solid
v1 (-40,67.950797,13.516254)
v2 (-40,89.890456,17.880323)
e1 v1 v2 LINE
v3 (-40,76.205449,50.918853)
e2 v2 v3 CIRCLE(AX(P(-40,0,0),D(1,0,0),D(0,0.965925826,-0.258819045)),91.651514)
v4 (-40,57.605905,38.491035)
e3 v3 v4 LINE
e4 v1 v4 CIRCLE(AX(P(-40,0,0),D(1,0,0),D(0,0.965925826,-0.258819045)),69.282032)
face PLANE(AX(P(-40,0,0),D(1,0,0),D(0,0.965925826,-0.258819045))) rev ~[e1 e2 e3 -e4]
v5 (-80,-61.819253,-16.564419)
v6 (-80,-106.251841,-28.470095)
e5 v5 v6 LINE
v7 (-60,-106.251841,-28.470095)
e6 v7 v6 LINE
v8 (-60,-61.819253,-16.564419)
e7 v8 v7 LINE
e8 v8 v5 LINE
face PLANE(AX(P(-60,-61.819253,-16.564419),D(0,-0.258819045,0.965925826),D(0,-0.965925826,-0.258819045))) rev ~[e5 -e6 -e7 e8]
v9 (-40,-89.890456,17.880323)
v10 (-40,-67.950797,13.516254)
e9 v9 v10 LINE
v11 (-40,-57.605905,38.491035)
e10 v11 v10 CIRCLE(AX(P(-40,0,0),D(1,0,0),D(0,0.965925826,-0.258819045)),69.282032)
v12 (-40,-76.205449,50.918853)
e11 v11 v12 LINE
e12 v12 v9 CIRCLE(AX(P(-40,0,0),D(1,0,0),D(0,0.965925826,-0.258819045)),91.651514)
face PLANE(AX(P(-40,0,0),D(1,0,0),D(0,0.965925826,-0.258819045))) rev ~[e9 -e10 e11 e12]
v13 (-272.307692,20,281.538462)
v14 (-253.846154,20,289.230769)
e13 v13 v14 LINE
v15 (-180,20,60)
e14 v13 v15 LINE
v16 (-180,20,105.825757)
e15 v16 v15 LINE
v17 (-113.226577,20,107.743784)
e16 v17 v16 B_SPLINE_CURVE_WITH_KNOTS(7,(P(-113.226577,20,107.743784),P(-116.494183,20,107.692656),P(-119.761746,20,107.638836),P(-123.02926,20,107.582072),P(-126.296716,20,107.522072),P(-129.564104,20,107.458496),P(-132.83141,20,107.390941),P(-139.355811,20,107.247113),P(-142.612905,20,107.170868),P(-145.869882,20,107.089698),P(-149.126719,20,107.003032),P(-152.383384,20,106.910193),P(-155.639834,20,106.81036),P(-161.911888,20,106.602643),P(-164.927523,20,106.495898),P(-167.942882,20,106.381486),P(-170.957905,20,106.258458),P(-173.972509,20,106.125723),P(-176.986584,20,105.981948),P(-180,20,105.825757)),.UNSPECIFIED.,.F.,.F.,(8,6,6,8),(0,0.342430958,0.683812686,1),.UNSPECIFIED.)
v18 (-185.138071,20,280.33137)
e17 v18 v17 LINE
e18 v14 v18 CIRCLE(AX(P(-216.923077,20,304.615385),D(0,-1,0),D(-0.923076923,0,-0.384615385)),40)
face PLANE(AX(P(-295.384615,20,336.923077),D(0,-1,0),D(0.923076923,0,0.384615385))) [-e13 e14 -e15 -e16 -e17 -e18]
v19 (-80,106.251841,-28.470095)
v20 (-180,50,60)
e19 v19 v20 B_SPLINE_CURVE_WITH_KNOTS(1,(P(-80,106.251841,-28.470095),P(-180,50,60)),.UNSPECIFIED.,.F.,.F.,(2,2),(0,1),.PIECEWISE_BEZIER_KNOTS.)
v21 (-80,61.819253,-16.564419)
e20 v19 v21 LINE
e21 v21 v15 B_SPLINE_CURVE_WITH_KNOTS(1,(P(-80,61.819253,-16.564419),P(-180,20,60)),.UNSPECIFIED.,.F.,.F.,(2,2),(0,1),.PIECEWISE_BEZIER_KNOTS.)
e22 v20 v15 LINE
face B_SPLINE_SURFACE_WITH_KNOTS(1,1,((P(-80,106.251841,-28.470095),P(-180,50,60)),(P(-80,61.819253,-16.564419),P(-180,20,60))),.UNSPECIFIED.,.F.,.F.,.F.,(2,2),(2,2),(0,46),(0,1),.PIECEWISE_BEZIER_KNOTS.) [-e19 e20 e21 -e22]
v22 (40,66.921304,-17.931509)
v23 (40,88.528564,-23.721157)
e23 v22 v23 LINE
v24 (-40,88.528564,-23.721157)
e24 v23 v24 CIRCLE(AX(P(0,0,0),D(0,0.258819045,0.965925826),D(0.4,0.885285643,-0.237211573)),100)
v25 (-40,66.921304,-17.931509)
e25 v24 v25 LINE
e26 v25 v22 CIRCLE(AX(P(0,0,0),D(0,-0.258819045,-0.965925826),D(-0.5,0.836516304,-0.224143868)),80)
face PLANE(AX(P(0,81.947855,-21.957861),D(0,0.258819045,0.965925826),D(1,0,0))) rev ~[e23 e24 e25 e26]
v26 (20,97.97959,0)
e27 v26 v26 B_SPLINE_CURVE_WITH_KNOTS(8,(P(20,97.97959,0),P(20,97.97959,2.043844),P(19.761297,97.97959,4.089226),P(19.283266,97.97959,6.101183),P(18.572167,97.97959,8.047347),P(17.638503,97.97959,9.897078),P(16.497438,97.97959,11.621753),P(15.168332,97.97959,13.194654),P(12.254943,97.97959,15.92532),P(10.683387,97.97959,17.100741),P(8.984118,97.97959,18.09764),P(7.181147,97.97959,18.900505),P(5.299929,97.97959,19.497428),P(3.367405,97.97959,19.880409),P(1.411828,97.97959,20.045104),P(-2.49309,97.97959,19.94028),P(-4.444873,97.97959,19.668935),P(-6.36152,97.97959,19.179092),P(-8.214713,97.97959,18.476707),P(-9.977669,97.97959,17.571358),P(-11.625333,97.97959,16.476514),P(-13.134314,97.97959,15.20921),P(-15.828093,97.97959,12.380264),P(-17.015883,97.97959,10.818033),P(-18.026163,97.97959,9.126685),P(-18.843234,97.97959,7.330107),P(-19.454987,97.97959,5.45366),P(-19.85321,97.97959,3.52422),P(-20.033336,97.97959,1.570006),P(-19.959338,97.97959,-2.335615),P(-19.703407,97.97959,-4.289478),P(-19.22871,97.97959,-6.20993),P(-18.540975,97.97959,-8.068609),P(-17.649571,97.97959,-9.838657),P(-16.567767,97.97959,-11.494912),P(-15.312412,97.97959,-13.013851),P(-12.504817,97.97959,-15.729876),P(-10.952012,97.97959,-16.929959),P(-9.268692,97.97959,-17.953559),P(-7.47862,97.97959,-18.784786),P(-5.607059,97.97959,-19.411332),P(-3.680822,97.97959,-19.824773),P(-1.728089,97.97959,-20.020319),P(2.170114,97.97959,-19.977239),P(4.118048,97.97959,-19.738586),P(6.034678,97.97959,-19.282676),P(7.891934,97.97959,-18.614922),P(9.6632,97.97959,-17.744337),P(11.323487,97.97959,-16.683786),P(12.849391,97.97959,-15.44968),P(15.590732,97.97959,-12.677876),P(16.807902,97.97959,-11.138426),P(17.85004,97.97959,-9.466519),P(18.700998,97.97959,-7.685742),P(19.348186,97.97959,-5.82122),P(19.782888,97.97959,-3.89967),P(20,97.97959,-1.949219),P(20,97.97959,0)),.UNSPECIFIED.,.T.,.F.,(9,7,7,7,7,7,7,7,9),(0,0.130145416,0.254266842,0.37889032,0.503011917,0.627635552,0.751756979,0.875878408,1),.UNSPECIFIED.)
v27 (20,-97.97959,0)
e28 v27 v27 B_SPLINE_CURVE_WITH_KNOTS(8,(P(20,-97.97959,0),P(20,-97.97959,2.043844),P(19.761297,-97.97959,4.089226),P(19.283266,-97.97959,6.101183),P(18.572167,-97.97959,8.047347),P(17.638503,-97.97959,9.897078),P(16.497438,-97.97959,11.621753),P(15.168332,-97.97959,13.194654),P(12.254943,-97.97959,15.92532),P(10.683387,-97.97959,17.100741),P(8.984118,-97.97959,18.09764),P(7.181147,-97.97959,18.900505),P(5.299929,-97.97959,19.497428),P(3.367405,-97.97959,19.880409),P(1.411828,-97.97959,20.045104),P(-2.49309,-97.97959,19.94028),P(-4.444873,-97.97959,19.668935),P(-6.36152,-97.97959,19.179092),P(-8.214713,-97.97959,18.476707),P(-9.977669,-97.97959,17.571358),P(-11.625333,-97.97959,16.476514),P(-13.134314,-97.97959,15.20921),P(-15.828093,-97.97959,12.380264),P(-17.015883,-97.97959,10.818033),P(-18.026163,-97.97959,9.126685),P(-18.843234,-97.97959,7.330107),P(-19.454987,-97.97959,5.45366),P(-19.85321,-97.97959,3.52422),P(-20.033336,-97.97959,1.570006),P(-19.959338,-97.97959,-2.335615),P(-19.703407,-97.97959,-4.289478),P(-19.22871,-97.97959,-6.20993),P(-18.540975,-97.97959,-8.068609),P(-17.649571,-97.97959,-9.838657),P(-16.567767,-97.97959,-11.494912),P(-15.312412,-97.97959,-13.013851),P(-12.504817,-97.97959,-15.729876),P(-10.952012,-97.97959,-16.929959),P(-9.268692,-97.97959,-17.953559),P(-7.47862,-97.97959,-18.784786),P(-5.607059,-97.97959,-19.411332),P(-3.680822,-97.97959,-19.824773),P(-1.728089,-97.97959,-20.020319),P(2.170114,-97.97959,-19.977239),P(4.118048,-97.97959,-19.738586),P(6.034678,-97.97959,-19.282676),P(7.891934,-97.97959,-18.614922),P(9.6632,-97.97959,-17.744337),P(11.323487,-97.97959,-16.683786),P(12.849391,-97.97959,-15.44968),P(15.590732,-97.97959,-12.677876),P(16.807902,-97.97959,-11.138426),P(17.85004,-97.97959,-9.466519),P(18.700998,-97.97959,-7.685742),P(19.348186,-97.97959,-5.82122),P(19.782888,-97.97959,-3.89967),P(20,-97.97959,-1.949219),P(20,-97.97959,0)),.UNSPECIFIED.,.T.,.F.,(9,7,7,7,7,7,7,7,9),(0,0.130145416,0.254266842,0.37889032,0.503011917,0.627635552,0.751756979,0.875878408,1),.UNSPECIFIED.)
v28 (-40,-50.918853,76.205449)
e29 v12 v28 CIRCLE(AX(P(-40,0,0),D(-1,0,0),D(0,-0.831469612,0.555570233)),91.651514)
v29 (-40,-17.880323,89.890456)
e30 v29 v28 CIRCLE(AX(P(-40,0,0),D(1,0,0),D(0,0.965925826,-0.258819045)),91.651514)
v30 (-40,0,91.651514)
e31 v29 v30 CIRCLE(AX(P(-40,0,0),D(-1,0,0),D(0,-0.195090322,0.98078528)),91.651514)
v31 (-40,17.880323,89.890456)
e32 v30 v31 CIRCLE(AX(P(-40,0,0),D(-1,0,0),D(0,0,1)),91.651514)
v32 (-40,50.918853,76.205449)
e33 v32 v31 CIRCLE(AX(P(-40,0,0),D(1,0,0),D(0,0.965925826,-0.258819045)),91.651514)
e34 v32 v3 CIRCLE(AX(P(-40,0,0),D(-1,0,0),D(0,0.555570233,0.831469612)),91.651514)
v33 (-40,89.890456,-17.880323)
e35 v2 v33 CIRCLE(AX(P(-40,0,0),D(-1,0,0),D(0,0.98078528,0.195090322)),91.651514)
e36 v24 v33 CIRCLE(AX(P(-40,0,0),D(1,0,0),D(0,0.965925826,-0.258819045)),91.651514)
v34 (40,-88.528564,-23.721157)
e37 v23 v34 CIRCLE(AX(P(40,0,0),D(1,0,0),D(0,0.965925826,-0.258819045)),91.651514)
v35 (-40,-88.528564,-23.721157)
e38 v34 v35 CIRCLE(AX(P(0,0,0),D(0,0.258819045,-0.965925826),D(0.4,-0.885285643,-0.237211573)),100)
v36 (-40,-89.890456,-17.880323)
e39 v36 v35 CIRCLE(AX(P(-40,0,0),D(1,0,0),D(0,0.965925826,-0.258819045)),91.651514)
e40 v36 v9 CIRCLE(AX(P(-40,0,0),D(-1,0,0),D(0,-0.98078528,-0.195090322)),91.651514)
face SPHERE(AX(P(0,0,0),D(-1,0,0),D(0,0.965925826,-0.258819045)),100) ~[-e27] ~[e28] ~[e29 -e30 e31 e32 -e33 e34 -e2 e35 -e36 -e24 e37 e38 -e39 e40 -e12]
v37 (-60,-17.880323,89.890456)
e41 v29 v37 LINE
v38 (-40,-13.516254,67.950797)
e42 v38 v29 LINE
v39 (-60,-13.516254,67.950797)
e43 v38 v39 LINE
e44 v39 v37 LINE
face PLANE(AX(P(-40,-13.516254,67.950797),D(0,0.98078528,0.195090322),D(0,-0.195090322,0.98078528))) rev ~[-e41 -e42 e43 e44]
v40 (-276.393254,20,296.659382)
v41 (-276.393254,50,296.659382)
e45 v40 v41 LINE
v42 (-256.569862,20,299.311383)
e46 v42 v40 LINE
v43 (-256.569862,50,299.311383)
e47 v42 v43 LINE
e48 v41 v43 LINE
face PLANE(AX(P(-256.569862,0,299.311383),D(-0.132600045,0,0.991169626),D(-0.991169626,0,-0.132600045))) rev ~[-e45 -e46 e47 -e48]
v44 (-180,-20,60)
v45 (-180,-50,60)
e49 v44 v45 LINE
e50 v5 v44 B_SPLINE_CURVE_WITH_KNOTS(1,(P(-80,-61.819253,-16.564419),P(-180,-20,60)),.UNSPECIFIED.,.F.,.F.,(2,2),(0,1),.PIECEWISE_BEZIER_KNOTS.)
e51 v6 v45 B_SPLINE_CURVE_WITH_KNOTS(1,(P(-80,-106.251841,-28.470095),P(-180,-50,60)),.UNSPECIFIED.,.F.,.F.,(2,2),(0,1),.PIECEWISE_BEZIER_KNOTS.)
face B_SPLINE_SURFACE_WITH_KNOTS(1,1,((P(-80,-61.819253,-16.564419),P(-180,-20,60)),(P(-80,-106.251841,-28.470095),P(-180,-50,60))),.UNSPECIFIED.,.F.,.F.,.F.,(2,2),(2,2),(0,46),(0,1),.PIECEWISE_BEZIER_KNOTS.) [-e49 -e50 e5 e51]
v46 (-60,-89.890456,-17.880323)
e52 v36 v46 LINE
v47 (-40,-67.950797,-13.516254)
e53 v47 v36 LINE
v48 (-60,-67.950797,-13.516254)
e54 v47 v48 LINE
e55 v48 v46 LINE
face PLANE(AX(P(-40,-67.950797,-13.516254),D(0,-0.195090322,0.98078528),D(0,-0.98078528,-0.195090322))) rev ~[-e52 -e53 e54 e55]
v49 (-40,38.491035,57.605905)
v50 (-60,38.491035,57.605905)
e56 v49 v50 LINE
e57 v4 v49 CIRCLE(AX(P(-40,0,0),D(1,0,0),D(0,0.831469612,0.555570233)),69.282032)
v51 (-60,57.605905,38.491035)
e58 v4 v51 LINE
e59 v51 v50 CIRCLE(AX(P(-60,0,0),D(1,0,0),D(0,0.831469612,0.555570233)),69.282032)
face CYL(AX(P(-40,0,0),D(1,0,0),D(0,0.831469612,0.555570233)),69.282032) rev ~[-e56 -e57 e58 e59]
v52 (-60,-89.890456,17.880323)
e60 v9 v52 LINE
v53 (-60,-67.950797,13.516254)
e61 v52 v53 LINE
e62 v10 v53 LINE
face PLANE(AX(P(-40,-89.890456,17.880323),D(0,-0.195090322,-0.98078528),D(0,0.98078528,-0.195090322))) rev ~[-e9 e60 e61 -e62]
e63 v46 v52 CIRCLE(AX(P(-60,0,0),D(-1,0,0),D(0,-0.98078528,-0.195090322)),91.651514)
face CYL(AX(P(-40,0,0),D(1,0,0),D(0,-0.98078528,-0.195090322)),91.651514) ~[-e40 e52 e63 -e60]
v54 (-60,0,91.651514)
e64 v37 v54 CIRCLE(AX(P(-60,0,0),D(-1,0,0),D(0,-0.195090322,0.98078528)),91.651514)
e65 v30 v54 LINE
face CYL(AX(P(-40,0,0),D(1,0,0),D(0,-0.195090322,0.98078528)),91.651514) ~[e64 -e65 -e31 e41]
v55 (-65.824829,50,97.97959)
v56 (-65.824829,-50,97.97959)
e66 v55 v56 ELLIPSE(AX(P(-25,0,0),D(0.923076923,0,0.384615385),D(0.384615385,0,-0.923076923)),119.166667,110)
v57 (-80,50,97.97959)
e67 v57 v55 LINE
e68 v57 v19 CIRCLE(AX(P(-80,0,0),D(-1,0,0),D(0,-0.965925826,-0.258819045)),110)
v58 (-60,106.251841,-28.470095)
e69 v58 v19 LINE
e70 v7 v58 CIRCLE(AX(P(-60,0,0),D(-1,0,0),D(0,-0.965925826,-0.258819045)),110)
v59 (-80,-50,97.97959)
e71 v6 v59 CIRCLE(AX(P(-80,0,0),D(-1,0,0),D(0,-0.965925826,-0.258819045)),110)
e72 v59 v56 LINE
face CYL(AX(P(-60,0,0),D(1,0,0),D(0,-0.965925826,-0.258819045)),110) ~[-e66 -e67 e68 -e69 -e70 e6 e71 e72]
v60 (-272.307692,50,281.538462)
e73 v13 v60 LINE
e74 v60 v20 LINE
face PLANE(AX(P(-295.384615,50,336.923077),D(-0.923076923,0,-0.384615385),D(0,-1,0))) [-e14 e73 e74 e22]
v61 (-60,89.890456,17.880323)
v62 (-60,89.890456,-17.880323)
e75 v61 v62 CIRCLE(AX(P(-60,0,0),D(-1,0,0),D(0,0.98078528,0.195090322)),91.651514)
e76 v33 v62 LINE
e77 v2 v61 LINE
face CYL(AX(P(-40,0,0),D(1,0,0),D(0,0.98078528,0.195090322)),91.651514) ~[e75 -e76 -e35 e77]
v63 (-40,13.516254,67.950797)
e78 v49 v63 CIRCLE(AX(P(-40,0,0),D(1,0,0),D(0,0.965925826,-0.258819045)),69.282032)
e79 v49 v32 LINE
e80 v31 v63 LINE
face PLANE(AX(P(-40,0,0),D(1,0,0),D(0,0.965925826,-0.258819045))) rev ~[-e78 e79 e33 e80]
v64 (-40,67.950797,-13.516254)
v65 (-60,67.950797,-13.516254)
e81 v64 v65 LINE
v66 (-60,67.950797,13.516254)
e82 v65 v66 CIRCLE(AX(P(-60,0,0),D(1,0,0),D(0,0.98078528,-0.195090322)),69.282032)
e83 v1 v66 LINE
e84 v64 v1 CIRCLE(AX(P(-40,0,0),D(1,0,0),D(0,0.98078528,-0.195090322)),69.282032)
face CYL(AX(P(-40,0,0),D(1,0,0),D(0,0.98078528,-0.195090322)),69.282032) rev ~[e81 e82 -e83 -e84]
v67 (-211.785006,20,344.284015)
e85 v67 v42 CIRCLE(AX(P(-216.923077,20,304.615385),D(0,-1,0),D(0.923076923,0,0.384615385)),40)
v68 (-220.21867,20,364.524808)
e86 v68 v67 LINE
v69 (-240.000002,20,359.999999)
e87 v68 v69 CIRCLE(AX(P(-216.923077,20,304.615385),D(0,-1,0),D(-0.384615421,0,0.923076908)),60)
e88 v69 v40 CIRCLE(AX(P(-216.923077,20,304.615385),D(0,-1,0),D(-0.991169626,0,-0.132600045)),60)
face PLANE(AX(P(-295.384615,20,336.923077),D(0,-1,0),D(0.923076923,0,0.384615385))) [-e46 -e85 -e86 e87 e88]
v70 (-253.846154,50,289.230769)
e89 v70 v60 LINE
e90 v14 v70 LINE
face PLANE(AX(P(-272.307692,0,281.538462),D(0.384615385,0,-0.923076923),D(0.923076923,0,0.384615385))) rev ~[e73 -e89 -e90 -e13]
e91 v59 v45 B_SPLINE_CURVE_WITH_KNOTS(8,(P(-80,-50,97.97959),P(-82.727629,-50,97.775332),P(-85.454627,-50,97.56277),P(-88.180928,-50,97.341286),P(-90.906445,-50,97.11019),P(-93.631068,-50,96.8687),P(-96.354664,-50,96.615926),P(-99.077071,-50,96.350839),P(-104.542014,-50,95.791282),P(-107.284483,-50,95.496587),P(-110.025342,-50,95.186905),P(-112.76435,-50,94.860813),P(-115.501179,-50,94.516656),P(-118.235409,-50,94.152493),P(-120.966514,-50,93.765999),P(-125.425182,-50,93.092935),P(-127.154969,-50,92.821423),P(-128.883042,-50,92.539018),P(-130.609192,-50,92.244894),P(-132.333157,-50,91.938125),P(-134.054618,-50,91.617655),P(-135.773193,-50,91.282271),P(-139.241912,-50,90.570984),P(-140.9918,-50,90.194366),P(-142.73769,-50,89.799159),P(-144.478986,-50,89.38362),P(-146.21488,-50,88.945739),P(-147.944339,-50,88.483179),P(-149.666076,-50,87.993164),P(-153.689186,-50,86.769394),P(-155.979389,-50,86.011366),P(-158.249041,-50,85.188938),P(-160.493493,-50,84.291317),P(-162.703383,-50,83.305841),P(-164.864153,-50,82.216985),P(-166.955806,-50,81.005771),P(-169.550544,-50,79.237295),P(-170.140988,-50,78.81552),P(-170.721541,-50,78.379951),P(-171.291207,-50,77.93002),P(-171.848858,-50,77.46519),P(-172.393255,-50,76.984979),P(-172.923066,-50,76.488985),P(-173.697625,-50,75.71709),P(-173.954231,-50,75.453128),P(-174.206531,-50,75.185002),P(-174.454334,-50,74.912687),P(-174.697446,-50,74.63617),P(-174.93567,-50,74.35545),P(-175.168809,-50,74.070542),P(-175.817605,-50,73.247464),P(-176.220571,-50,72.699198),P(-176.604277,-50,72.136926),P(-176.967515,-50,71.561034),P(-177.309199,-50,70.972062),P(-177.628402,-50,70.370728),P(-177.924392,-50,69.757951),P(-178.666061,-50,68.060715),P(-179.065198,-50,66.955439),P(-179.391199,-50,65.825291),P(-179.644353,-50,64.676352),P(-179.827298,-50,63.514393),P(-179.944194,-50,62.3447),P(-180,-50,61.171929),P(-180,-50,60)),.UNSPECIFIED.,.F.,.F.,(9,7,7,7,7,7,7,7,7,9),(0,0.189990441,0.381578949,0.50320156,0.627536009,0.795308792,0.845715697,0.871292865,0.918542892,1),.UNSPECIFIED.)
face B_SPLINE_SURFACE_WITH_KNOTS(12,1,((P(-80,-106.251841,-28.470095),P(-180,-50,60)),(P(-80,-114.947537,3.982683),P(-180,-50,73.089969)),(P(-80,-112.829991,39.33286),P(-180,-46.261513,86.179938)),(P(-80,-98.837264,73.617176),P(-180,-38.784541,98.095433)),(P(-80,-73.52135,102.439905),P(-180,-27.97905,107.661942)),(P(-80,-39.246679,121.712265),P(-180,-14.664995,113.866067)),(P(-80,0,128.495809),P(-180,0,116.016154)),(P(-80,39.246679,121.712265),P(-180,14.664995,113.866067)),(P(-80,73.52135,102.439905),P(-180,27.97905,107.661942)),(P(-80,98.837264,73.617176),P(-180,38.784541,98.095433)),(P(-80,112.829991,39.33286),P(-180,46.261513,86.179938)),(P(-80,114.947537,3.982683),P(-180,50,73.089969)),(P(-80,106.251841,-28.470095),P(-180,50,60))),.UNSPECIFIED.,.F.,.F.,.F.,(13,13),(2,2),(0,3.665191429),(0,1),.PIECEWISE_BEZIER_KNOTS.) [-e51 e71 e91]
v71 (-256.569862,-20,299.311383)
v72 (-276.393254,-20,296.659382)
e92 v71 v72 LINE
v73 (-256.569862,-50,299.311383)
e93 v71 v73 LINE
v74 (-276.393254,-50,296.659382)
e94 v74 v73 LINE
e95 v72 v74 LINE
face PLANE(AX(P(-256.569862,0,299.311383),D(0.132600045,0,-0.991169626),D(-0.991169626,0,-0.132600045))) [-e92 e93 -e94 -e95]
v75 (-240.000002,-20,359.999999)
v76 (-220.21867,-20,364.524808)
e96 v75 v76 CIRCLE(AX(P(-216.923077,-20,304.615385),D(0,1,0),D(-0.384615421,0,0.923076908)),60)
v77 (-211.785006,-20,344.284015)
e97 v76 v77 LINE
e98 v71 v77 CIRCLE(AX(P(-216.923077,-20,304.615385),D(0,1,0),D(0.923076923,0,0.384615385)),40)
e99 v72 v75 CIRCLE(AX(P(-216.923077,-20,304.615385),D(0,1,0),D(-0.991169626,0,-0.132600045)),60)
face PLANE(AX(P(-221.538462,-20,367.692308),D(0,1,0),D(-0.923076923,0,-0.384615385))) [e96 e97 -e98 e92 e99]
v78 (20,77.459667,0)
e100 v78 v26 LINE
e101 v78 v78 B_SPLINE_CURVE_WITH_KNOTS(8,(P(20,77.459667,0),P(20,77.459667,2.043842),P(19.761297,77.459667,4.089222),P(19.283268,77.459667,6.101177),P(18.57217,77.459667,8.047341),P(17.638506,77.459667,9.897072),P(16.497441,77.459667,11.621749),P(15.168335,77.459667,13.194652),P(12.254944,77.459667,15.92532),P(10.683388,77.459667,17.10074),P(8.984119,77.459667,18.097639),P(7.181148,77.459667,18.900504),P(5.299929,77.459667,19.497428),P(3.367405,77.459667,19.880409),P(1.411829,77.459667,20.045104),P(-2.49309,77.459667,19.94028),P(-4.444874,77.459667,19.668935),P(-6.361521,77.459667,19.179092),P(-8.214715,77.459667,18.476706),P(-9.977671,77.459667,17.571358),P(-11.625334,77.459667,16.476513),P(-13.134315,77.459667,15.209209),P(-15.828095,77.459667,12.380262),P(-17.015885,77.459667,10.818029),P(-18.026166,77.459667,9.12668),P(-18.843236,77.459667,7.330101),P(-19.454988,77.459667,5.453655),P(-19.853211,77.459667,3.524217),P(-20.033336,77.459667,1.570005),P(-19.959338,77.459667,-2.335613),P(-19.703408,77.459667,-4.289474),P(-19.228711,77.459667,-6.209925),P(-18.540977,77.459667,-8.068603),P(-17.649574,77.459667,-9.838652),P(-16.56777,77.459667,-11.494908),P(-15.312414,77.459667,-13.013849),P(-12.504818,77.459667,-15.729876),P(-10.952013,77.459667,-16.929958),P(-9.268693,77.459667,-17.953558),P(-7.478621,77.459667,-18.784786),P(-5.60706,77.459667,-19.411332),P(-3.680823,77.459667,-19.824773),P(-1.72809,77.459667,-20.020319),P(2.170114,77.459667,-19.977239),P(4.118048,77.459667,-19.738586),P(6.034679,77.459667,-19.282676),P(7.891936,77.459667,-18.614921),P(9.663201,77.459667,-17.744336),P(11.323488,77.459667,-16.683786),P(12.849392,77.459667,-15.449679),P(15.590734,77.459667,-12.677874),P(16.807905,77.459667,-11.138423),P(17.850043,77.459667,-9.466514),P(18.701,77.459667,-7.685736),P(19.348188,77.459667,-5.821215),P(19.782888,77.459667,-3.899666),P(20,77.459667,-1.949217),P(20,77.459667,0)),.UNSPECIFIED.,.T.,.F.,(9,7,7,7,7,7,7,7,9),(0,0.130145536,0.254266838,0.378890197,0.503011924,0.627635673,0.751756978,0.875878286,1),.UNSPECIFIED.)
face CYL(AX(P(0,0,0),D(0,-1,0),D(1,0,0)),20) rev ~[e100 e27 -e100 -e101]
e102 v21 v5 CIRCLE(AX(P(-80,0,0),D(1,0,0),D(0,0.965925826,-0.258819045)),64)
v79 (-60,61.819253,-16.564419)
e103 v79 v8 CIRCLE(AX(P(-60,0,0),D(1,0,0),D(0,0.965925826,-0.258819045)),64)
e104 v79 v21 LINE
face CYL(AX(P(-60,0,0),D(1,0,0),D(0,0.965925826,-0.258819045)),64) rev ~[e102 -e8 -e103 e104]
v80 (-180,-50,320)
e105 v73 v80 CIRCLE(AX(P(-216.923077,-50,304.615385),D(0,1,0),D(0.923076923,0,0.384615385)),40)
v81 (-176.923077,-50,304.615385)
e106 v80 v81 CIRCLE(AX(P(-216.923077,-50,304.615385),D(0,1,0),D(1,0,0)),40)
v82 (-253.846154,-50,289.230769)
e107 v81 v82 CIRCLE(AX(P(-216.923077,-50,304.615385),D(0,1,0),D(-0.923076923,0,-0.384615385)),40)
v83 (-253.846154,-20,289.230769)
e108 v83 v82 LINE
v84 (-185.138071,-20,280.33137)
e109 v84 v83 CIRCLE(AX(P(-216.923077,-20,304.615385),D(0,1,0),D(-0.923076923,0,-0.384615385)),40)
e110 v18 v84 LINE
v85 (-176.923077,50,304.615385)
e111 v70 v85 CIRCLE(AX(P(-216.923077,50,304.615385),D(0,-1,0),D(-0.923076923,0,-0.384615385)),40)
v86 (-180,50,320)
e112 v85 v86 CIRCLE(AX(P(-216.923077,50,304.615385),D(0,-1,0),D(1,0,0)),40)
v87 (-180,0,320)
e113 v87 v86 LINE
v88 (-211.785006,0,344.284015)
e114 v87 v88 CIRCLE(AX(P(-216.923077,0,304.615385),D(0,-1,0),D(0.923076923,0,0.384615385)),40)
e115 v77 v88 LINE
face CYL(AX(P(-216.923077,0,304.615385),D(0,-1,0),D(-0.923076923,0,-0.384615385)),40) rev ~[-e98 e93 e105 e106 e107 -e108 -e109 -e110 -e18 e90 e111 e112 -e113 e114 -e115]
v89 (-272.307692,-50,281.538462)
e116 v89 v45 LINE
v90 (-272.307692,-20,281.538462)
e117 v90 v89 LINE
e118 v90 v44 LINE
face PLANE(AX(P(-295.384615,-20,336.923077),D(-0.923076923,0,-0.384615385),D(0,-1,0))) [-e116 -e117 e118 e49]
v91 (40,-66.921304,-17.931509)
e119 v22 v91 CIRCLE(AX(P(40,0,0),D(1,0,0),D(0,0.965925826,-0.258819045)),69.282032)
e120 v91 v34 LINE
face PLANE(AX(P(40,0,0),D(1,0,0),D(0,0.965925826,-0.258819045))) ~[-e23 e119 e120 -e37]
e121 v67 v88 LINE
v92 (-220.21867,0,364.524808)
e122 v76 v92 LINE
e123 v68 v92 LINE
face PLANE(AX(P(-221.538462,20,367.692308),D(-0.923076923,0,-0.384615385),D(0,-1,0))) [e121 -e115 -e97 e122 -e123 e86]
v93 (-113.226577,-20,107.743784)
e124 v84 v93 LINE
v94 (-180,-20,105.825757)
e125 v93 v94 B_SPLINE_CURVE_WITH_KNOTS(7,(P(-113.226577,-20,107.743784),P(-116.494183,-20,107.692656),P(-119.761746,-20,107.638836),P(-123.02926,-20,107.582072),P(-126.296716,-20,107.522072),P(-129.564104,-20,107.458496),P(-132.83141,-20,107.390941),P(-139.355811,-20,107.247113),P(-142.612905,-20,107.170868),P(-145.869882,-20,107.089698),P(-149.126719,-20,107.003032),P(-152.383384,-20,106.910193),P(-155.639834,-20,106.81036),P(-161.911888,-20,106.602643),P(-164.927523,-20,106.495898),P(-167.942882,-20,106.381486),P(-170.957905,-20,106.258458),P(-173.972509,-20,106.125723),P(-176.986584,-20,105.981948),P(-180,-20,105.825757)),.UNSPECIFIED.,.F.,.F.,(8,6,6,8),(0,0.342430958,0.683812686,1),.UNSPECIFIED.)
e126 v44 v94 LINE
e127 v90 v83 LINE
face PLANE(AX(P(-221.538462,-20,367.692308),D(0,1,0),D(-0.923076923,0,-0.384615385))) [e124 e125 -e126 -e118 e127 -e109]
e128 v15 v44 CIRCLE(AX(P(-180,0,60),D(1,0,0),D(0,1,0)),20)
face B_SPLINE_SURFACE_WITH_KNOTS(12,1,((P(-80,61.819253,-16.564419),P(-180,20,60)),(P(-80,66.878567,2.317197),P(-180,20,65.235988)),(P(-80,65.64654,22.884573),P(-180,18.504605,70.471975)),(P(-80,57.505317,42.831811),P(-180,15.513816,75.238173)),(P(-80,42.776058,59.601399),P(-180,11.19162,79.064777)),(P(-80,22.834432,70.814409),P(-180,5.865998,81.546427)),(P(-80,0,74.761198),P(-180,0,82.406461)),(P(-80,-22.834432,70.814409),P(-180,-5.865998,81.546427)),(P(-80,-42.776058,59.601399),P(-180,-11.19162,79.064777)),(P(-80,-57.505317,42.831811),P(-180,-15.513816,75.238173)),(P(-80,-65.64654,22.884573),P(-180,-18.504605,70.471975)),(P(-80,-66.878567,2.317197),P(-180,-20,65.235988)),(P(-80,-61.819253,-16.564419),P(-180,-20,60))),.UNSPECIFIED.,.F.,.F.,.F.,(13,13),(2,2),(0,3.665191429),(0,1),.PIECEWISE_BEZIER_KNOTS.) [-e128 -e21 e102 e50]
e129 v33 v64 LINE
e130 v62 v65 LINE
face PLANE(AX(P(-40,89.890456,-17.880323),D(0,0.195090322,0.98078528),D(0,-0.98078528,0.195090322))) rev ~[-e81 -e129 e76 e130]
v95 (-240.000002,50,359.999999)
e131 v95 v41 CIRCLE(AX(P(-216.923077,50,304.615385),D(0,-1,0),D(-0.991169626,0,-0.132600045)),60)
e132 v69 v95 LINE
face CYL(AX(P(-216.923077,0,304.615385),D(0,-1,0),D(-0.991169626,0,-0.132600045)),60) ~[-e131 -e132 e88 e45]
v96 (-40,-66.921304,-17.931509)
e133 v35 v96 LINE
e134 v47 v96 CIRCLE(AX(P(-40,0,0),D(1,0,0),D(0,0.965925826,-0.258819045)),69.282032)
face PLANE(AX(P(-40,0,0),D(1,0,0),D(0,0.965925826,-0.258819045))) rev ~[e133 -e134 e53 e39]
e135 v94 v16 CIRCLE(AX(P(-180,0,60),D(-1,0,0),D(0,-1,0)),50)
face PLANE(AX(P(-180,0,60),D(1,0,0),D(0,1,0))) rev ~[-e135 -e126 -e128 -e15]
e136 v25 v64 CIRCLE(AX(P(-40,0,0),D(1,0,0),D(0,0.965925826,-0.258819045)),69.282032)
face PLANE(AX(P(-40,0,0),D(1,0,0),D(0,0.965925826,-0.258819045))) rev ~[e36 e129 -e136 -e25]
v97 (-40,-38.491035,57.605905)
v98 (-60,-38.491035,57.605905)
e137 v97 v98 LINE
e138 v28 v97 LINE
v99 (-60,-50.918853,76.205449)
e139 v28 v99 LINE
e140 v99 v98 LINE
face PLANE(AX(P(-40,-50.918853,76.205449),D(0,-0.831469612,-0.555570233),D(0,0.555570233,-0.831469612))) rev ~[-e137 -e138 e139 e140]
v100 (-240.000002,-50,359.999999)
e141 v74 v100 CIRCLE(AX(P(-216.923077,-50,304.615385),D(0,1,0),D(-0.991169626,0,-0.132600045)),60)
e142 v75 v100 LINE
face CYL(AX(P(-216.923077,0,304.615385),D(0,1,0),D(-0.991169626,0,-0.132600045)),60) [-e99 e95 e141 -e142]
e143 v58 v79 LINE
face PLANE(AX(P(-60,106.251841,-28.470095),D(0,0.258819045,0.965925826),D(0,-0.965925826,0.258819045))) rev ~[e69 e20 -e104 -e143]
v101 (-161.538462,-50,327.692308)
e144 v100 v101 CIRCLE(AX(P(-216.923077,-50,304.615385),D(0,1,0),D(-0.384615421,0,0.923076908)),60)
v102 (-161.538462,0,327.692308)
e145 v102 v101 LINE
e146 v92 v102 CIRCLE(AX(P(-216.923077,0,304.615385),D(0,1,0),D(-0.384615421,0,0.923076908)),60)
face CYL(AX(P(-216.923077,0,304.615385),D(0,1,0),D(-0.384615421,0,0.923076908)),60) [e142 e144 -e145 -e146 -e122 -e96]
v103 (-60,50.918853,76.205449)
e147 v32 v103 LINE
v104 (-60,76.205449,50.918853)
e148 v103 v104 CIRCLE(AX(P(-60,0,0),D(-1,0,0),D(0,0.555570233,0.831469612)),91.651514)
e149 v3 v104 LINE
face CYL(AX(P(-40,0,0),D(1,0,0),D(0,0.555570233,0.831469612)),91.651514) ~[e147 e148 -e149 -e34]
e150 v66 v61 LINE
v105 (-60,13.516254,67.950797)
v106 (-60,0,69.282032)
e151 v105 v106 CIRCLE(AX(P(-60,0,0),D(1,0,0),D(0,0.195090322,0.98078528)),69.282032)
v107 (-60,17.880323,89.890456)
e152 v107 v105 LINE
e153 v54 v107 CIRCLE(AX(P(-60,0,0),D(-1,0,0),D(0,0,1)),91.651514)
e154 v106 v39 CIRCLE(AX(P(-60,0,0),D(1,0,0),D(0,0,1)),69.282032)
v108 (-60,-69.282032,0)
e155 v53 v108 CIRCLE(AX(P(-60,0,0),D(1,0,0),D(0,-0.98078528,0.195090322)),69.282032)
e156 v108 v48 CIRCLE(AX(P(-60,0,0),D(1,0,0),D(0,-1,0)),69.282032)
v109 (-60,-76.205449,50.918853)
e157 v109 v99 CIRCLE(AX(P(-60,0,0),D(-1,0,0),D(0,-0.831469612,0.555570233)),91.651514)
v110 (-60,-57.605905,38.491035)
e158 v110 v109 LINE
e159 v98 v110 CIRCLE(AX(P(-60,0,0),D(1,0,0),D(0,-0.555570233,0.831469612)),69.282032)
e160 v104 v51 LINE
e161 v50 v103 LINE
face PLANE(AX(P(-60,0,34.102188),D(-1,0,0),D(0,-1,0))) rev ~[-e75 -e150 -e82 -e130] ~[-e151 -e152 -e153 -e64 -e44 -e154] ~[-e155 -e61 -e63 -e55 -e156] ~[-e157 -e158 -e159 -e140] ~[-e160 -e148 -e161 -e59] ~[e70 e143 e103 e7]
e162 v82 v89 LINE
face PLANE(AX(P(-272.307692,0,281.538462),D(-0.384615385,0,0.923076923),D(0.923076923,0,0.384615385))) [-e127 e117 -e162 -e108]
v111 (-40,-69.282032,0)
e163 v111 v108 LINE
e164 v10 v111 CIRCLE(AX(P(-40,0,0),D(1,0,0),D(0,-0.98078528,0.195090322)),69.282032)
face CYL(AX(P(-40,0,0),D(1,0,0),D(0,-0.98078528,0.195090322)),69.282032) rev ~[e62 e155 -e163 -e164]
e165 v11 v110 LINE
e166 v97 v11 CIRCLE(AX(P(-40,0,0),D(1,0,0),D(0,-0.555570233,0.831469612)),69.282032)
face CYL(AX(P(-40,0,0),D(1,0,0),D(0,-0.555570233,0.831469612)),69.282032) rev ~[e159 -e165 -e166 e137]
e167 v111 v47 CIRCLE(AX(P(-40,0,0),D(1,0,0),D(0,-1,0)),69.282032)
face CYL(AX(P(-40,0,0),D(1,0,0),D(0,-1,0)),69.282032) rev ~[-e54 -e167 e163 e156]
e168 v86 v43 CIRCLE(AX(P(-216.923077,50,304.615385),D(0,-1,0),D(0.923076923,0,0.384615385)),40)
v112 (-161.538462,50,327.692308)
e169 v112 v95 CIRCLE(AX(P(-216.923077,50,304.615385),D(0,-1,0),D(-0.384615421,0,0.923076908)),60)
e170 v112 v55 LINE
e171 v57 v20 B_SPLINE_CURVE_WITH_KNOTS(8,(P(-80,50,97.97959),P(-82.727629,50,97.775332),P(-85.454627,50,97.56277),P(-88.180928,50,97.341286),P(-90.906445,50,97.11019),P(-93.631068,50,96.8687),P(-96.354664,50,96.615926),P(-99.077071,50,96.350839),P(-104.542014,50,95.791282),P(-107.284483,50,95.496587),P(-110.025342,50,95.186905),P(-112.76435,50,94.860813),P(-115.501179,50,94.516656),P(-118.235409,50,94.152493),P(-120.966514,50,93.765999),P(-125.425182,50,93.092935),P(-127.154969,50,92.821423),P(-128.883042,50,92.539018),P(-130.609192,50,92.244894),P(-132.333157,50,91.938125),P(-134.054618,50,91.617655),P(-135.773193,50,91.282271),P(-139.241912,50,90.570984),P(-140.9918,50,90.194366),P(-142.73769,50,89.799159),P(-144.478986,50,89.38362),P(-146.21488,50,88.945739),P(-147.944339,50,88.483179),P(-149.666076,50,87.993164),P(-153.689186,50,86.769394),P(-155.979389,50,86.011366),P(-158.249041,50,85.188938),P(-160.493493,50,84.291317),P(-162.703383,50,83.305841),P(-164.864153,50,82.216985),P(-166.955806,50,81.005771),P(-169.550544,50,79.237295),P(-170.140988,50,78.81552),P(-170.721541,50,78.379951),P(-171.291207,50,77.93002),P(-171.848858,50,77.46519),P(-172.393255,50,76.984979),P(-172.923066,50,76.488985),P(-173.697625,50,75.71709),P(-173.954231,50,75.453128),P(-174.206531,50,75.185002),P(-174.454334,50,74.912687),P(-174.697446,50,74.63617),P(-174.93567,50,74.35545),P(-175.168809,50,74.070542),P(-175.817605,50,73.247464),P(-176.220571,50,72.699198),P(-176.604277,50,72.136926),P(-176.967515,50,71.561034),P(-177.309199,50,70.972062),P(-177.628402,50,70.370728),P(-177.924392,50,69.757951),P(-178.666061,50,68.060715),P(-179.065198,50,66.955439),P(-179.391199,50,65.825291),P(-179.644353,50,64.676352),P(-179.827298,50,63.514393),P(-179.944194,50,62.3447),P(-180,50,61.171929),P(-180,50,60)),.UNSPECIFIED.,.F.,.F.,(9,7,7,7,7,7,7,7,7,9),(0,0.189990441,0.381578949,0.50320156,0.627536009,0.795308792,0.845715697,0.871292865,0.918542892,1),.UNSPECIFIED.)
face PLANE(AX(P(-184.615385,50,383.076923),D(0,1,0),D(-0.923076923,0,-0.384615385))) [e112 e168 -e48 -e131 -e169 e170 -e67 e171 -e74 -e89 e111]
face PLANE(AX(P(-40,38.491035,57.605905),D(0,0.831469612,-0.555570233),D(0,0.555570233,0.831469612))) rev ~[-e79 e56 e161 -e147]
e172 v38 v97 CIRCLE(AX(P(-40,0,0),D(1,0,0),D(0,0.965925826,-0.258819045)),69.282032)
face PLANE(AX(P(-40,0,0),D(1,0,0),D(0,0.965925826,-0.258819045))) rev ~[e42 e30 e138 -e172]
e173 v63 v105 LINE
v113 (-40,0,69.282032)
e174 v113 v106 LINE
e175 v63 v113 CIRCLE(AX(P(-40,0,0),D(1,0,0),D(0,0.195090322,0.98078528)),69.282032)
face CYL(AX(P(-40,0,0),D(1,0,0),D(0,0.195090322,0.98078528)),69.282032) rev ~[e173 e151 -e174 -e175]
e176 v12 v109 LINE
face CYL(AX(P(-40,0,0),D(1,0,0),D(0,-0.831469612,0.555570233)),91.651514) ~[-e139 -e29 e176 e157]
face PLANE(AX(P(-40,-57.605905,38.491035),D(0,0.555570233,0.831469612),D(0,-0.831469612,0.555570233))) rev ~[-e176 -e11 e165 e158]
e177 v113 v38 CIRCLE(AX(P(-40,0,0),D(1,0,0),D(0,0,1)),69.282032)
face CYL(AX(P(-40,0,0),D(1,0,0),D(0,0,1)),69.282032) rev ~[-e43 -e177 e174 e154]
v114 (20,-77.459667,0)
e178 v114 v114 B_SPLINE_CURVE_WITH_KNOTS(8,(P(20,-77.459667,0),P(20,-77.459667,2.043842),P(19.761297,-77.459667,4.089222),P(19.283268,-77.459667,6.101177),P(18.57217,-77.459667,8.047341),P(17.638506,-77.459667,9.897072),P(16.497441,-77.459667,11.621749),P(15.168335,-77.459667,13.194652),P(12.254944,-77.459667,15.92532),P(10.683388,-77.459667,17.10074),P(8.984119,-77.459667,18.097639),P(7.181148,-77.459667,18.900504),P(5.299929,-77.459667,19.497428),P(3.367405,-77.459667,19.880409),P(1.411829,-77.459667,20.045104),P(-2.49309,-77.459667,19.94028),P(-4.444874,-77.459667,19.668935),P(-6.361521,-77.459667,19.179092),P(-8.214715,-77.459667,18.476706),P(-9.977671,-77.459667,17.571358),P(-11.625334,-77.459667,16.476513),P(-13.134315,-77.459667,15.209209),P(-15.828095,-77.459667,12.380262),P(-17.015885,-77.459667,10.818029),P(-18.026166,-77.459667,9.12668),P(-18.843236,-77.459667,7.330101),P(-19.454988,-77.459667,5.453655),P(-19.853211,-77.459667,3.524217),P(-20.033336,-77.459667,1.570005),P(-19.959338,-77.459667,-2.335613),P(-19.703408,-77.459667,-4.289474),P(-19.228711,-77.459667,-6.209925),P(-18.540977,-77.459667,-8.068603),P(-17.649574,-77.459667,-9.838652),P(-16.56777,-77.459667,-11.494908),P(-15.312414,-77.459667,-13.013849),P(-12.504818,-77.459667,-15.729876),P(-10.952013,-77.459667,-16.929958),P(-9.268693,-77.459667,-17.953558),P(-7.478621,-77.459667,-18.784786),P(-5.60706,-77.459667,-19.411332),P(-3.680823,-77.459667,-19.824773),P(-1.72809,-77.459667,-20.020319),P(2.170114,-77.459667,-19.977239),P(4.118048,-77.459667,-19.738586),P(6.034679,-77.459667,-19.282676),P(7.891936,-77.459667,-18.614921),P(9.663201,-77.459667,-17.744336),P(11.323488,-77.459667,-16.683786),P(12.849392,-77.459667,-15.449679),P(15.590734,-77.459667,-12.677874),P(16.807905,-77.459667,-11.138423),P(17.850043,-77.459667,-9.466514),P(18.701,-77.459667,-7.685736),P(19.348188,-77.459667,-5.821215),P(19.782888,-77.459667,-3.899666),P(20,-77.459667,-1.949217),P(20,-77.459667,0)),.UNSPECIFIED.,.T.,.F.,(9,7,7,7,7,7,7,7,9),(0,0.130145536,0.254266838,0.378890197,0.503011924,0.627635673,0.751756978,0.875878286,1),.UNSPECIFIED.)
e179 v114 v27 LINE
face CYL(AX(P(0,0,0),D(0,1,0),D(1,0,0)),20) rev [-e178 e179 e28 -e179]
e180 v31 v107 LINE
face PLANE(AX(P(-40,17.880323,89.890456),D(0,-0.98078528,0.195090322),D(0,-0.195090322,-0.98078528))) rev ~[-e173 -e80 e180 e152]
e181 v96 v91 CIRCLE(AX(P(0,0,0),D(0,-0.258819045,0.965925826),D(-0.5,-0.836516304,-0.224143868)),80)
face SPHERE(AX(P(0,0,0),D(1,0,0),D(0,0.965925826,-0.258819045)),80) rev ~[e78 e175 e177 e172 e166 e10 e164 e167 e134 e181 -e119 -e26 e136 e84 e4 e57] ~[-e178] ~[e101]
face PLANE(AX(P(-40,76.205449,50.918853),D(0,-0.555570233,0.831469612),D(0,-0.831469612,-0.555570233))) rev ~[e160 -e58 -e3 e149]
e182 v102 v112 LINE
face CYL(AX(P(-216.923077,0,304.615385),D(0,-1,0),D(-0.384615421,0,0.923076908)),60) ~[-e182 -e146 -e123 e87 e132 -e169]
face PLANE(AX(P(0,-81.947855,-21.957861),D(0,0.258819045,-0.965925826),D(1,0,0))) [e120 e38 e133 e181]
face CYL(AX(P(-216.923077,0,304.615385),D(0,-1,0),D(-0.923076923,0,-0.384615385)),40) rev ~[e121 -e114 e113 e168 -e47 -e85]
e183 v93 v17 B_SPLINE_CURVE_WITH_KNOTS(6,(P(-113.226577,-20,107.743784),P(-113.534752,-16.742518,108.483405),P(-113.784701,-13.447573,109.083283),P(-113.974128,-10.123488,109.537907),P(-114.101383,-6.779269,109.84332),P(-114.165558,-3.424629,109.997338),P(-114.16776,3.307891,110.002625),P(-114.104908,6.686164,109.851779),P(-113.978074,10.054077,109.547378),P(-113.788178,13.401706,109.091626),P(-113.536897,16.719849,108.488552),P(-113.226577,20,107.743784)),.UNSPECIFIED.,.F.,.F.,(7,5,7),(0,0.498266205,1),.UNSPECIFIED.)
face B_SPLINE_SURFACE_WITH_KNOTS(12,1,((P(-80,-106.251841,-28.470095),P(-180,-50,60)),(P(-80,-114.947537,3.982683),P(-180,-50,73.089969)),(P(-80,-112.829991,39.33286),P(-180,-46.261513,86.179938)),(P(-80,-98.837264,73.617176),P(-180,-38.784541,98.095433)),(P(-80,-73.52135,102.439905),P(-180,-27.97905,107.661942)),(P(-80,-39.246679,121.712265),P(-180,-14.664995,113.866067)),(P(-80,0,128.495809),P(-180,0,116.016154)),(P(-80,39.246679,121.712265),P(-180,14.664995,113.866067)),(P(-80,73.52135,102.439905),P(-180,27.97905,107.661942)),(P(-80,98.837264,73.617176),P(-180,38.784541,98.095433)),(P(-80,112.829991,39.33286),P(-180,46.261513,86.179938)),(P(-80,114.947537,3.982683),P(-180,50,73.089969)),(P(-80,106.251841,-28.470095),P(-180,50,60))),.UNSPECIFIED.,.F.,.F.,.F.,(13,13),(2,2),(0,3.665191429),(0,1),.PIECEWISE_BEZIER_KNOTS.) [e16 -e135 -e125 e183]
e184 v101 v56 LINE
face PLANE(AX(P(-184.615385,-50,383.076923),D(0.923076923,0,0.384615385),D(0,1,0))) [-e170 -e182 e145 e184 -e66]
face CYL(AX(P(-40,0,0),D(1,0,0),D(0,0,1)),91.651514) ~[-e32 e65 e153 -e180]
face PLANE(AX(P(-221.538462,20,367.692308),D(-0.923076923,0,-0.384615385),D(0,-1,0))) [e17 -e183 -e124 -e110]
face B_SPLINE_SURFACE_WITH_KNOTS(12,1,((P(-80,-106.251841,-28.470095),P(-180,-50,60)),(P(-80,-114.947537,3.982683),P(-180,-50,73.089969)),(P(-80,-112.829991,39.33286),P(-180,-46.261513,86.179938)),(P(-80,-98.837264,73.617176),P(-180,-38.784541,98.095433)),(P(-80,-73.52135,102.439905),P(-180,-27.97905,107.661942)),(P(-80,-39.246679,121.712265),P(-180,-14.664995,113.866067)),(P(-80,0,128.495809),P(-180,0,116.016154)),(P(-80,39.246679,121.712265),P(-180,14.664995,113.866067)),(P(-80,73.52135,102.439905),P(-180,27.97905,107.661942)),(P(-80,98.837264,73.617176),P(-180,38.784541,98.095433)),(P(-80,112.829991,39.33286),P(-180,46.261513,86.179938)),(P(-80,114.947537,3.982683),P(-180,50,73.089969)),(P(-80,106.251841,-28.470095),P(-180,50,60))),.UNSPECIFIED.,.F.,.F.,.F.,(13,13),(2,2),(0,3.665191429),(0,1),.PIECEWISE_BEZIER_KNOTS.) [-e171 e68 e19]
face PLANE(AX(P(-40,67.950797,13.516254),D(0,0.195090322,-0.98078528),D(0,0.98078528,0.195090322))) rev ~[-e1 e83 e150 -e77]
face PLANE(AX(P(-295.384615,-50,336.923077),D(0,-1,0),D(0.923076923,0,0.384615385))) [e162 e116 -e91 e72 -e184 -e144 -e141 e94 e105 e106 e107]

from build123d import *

# Parameters (mm, degrees)
F1_ANGLE_BACK  = 105
F1_ANGLE       = 210
F2_R           = 20
F3_DEPTH       = 100.001
F3_DEPTH_BACK  = 100.001
F5_DEPTH       = 20
F7_DEPTH       = 20
F19_DEPTH      = 110.0010001
F19_DEPTH_BACK = 110.0010001


# Not quite as in the source:
# - a feature names something its author has since deleted; it is built from what else it names


with BuildPart() as f1:
    # F0 (on Front) → F1 (revolve)
    with BuildSketch(Plane.XZ, mode=Mode.PRIVATE) as f1_sk:
        with BuildLine():
            Line((40, 69.2820323028), (40, 91.6515138991))
            ThreePointArc((40, 91.6515138991), (0, 100), (-40, 91.6515138991))
            Line((-40, 91.6515138991), (-40, 69.2820323028))
            ThreePointArc((-40, 69.2820323028), (0, 80), (40, 69.2820323028))
        make_face()
    revolve(f1_sk.sketch.rotate(Axis((77.3328692646, 0, 0), (1, 0, 0)), -F1_ANGLE_BACK), axis=Axis((77.3328692646, 0, 0), (1, 0, 0)), revolution_arc=F1_ANGLE)

    # F2 (on Front) → F3 (cut, two sides)
    with BuildSketch(Plane.XZ) as f3_sk:
        Circle(F2_R)
    extrude(amount=-F3_DEPTH, mode=Mode.SUBTRACT)
    extrude(f3_sk.sketch, amount=F3_DEPTH_BACK, mode=Mode.SUBTRACT)

    # F4 (on face) → F5 (join)
    with BuildSketch(Plane(origin=(-40, 0, 0), x_dir=(0, -1, 0), z_dir=(-1, 0, 0))):
        with BuildLine():
            Line((0, 91.6515138991), (0, 69.2820323028))
            ThreePointArc((0, 69.2820323028), (6.7908266825, 68.9484203805), (13.5162539919, 67.950797479))
            Line((13.5162539919, 67.950797479), (17.8803233598, 89.8904557589))
            ThreePointArc((17.8803233598, 89.8904557589), (8.9834192993, 91.2101868088), (0, 91.6515138991))
        make_face()
        with BuildLine():
            ThreePointArc((-57.6059045383, 38.4910348305), (-48.9897948557, 48.9897948557), (-38.4910348305, 57.6059045383))
            Line((-38.4910348305, 57.6059045383), (-50.9188529335, 76.2054487286))
            ThreePointArc((-50.9188529335, 76.2054487286), (-64.8074069841, 64.8074069841), (-76.2054487286, 50.9188529335))
            Line((-76.2054487286, 50.9188529335), (-57.6059045383, 38.4910348305))
        make_face()
        with BuildLine():
            ThreePointArc((-67.950797479, -13.5162539919), (-69.2820323028, 0), (-67.950797479, 13.5162539919))
            Line((-67.950797479, 13.5162539919), (-89.8904557589, 17.8803233598))
            ThreePointArc((-89.8904557589, 17.8803233598), (-91.6515138991, 0), (-89.8904557589, -17.8803233598))
            Line((-89.8904557589, -17.8803233598), (-67.950797479, -13.5162539919))
        make_face()
        with BuildLine():
            Line((50.9188529335, 76.2054487286), (38.4910348305, 57.6059045383))
            ThreePointArc((38.4910348305, 57.6059045383), (48.9897948557, 48.9897948557), (57.6059045383, 38.4910348305))
            Line((57.6059045383, 38.4910348305), (76.2054487286, 50.9188529335))
            ThreePointArc((76.2054487286, 50.9188529335), (64.8074069841, 64.8074069841), (50.9188529335, 76.2054487286))
        make_face()
        with BuildLine():
            ThreePointArc((-13.5162539919, 67.950797479), (-6.7908266825, 68.9484203805), (0, 69.2820323028))
            Line((0, 69.2820323028), (0, 91.6515138991))
            ThreePointArc((0, 91.6515138991), (-8.9834192993, 91.2101868088), (-17.8803233598, 89.8904557589))
            Line((-17.8803233598, 89.8904557589), (-13.5162539919, 67.950797479))
        make_face()
        with BuildLine():
            Line((89.8904557589, 17.8803233598), (67.950797479, 13.5162539919))
            ThreePointArc((67.950797479, 13.5162539919), (68.9484203805, 6.7908266825), (69.2820323028, 0))
            ThreePointArc((69.2820323028, 0), (68.9484203805, -6.7908266825), (67.950797479, -13.5162539919))
            Line((67.950797479, -13.5162539919), (89.8904557589, -17.8803233598))
            ThreePointArc((89.8904557589, -17.8803233598), (91.6515138991, 0), (89.8904557589, 17.8803233598))
        make_face()
    extrude(amount=F5_DEPTH)

    # F6 (on face) → F7 (join)
    with BuildSketch(Plane(origin=(-60, 0, 0), x_dir=(0, -1, 0), z_dir=(-1, 0, 0))):
        with BuildLine():
            Line((61.8192528825, -16.5644188866), (106.2518408918, -28.4700949613))
            ThreePointArc((106.2518408918, -28.4700949613), (0, 110), (-106.2518408918, -28.4700949613))
            Line((-106.2518408918, -28.4700949613), (-61.8192528825, -16.5644188866))
            ThreePointArc((-61.8192528825, -16.5644188866), (0, 64), (61.8192528825, -16.5644188866))
        make_face()
    extrude(amount=F7_DEPTH)

    # F7_face (on face) → F11 section 0
    with BuildSketch(Plane(origin=(-80, 0, 46.9243182834), x_dir=(0, -1, 0), z_dir=(-1, 0, 0))):
        with BuildLine():
            Line((-106.2518408918, -75.3944132447), (-61.8192528825, -63.4887371699))
            ThreePointArc((-61.8192528825, -63.4887371699), (0, 17.0756817166), (61.8192528825, -63.4887371699))
            Line((61.8192528825, -63.4887371699), (106.2518408918, -75.3944132447))
            ThreePointArc((106.2518408918, -75.3944132447), (0, 63.0756817166), (-106.2518408918, -75.3944132447))
        make_face()
    # F9 (on offset) → F11 section 1
    with BuildSketch(Plane(origin=(-180, 0, 0), x_dir=(0, -1, 0), z_dir=(-1, 0, 0))):
        with BuildLine():
            Line((20, 60), (50, 60))
            ThreePointArc((50, 60), (0, 110), (-50, 60))
            Line((-50, 60), (-20, 60))
            ThreePointArc((-20, 60), (0, 80), (20, 60))
        make_face()
    loft()

    # F16 (on face) → F17 (join, up to the next surface of F1)
    with BuildSketch(Plane(origin=(-163.3136094675, 0, 391.9526627219), x_dir=(0.9230769231, 0, 0.3846153846), z_dir=(-0.3846153846, 0, 0.9230769231))):
        Polygon((-143.0769230769, -20), (-143.0769230769, -50), (-23.0769230769, -50), (-23.0769230769, 50), (-143.0769230769, 50), (-143.0769230769, 20), (-63.0769230769, 20), (-63.0769230769, -20), align=None)
    extrude(until=Until.NEXT, dir=(0.3846153846, 0, -0.9230769231))

    # F18 (on Front) → F19 (cut, two sides)
    with BuildSketch(Plane.XZ) as f19_sk:
        with BuildLine():
            Line((-295.3846153846, 336.9230769231), (-272.3076923077, 281.5384615385))
            ThreePointArc((-272.3076923077, 281.5384615385), (-274.8460121427, 288.9650307682), (-276.3932544968, 296.6593818913))
            ThreePointArc((-276.3932544968, 296.6593818913), (-268.9472491257, 334.5066125365), (-240.0000021838, 359.9999990901))
            Line((-240.0000021838, 359.9999990901), (-295.3846153846, 336.9230769231))
        make_face()
        with BuildLine():
            ThreePointArc((-240.0000021838, 359.9999990901), (-194.0780897016, 360.0960709742), (-161.5384615385, 327.6923076923))
            Line((-161.5384615385, 327.6923076923), (-184.6153846154, 383.0769230769))
            Line((-184.6153846154, 383.0769230769), (-240.0000021838, 359.9999990901))
        make_face()
        with BuildLine():
            Line((-216.9230769231, 304.6153846154), (-180, 320))
            ThreePointArc((-180, 320), (-227.3566461545, 343.2306747618), (-256.5698619723, 299.3113827993))
            Line((-256.5698619723, 299.3113827993), (-216.9230769231, 304.6153846154))
        make_face()
        with BuildLine():
            ThreePointArc((-256.5698619723, 299.3113827993), (-255.5383670695, 294.1818153839), (-253.8461538462, 289.2307692308))
            Line((-253.8461538462, 289.2307692308), (-216.9230769231, 304.6153846154))
            Line((-216.9230769231, 304.6153846154), (-256.5698619723, 299.3113827993))
        make_face()
        with BuildLine():
            ThreePointArc((-253.8461538462, 289.2307692308), (-209.0784315175, 265.3921575877), (-176.9230769231, 304.6153846154))
            ThreePointArc((-176.9230769231, 304.6153846154), (-177.6998498954, 312.4600300209), (-180, 320))
            Line((-180, 320), (-216.9230769231, 304.6153846154))
            Line((-216.9230769231, 304.6153846154), (-253.8461538462, 289.2307692308))
        make_face()
        with BuildLine():
            Line((-272.3076923077, 281.5384615385), (-253.8461538462, 289.2307692308))
            ThreePointArc((-253.8461538462, 289.2307692308), (-255.5383670695, 294.1818153839), (-256.5698619723, 299.3113827993))
            Line((-256.5698619723, 299.3113827993), (-276.3932544968, 296.6593818913))
            ThreePointArc((-276.3932544968, 296.6593818913), (-274.8460121427, 288.9650307682), (-272.3076923077, 281.5384615385))
        make_face()
    extrude(amount=-F19_DEPTH, mode=Mode.SUBTRACT)
    extrude(f19_sk.sketch, amount=F19_DEPTH_BACK, mode=Mode.SUBTRACT)


solid = f1.part
